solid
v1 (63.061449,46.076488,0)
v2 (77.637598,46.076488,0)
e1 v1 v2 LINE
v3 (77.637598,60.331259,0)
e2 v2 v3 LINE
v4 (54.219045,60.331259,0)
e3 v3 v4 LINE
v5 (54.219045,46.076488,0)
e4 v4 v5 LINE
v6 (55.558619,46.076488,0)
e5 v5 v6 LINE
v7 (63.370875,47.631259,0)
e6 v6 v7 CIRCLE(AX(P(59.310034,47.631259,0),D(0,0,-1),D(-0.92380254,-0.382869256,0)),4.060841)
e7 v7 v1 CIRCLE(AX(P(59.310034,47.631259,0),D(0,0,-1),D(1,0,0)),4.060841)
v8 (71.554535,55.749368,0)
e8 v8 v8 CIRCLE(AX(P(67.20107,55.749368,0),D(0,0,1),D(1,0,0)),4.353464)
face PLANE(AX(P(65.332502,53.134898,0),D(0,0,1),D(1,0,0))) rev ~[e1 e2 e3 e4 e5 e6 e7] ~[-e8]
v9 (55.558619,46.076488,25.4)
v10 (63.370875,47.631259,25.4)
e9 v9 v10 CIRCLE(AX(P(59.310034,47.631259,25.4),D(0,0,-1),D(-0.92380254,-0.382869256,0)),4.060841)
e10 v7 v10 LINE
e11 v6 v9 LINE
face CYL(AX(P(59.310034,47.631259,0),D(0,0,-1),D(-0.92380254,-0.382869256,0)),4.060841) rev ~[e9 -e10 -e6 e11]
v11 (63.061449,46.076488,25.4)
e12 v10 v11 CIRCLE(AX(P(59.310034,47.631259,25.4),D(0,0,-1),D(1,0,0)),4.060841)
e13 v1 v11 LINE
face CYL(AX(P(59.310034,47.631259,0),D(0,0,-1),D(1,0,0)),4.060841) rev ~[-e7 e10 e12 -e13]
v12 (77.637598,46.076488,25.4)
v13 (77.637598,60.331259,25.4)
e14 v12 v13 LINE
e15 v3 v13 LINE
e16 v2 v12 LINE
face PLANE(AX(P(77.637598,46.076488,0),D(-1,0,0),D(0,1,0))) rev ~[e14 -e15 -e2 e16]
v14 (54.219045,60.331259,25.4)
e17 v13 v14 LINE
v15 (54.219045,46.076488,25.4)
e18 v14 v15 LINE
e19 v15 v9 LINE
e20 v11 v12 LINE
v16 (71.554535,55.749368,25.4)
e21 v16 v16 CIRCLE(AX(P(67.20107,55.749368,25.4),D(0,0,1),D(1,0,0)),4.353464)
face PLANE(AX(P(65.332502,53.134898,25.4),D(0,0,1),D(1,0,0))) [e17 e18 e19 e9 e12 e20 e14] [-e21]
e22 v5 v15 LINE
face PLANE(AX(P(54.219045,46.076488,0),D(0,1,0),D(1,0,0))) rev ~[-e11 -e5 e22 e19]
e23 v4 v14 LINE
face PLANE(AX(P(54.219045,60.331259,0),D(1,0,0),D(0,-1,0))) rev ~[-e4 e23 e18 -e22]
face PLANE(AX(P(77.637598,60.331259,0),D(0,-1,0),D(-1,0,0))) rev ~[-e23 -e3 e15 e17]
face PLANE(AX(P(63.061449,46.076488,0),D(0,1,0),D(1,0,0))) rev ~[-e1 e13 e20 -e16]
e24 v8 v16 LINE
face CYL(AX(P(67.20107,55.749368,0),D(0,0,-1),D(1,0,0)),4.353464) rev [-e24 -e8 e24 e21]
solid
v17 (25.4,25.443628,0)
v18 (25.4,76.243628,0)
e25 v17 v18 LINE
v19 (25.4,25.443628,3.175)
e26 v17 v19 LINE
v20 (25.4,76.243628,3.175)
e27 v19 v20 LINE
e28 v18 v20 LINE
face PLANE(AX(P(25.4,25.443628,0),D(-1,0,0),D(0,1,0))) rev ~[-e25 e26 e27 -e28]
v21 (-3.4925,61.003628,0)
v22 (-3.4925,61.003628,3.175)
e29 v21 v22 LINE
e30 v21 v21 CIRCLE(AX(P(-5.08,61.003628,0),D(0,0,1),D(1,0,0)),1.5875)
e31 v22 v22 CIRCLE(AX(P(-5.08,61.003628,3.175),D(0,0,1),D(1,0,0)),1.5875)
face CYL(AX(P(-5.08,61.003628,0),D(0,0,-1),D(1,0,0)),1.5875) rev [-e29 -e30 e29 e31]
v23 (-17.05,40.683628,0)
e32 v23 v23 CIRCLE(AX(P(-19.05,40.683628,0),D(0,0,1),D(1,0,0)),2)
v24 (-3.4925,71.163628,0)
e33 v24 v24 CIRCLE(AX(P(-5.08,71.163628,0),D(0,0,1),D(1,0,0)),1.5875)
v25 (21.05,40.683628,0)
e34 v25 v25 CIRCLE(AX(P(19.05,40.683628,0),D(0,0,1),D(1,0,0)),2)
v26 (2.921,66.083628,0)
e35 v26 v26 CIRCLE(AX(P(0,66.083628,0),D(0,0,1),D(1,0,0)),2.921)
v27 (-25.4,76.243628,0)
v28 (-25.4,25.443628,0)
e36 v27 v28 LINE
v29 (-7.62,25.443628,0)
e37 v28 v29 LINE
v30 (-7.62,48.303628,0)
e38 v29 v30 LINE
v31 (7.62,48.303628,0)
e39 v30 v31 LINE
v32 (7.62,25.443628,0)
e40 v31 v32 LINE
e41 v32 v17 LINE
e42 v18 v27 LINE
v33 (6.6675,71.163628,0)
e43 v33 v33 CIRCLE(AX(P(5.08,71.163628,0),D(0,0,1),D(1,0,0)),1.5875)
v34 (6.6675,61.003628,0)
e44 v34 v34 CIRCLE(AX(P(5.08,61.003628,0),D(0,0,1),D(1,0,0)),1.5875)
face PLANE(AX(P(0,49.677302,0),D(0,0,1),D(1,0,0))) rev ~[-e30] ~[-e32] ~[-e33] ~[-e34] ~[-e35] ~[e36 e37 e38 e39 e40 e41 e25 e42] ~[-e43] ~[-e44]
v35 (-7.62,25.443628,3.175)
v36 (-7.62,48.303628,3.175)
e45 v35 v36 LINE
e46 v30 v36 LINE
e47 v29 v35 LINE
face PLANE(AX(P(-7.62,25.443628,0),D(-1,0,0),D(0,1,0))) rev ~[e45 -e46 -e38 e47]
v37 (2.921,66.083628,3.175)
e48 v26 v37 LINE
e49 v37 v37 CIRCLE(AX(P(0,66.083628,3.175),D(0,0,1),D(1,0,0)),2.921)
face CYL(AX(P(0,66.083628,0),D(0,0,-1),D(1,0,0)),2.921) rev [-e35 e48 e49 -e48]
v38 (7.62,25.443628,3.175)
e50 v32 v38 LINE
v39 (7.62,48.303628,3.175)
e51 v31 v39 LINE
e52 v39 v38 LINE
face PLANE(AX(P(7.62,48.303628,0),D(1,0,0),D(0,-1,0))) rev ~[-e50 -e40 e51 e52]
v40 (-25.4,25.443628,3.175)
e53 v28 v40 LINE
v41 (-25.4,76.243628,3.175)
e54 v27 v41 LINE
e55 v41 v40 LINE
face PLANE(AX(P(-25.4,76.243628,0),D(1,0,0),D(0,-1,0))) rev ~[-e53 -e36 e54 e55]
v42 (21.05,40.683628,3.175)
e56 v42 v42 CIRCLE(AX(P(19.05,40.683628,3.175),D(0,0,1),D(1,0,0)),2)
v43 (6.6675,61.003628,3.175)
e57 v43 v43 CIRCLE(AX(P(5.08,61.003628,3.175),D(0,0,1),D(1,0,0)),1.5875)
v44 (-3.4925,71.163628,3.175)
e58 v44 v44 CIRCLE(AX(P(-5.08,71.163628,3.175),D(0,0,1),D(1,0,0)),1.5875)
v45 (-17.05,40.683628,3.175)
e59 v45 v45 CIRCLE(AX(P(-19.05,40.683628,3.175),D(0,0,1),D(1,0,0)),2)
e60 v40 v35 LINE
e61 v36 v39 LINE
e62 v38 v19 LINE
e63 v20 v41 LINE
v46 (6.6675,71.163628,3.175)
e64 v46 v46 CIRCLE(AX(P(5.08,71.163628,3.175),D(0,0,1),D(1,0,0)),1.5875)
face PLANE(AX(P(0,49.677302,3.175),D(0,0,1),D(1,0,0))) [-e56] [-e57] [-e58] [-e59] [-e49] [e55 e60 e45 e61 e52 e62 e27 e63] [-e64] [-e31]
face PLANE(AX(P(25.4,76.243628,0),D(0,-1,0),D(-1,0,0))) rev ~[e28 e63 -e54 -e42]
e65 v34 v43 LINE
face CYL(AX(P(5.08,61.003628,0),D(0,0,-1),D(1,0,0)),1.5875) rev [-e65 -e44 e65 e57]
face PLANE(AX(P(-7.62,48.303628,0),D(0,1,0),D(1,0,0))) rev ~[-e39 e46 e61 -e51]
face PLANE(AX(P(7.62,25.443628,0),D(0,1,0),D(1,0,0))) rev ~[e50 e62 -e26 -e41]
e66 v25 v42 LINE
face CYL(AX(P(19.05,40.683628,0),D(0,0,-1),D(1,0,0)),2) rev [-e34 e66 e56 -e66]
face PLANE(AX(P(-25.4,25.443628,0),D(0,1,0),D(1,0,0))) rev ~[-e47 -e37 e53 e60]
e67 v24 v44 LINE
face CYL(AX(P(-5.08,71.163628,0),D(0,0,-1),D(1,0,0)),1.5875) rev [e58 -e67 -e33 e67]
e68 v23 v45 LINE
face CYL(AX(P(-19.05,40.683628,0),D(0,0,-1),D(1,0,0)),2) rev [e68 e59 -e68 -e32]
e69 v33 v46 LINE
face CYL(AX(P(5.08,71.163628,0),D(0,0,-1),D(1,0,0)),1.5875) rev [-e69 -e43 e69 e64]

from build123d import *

# Parameters (mm, degrees)
F0_R     = 2
F0_R_2   = 1.5875
F0_R_3   = 2.921
F1_DEPTH = 3.175
F0_R_4   = 4.3534644144
F2_DEPTH = 25.4


# Not quite as in the source:
# - a feature names something its author has since deleted; it is built from what else it names


with BuildPart() as f1:
    # F0 (on Top) → F1 (new body)
    with BuildSketch(Plane.XY):
        Polygon((-25.4, 76.2436284547), (-25.4, 25.4436284547), (-7.62, 25.4436284547), (-7.62, 48.3036284547), (7.62, 48.3036284547), (7.62, 25.4436284547), (25.4, 25.4436284547), (25.4, 76.2436284547), align=None)
        with Locations((-19.05, 40.6836284547)):
            Circle(F0_R, mode=Mode.SUBTRACT)
        with Locations((19.05, 40.6836284547)):
            Circle(F0_R, mode=Mode.SUBTRACT)
        with Locations((-5.08, 61.0036284547)):
            Circle(F0_R_2, mode=Mode.SUBTRACT)
        with Locations((5.08, 61.0036284547)):
            Circle(F0_R_2, mode=Mode.SUBTRACT)
        with Locations((0, 66.0836284547)):
            Circle(F0_R_3, mode=Mode.SUBTRACT)
        with Locations((-5.08, 71.1636284547)):
            Circle(F0_R_2, mode=Mode.SUBTRACT)
        with Locations((5.08, 71.1636284547)):
            Circle(F0_R_2, mode=Mode.SUBTRACT)
    extrude(amount=F1_DEPTH)


with BuildPart() as f2:
    # F0 (on Top) → F2 (new body)
    with BuildSketch(Plane.XY):
        with BuildLine():
            Line((77.6375979185, 60.3312589228), (54.219044745, 60.3312589228))
            Line((54.219044745, 60.3312589228), (54.219044745, 46.0764877498))
            Line((54.219044745, 46.0764877498), (55.5586186913, 46.0764877498))
            ThreePointArc((55.5586186913, 46.0764877498), (58.5174025864, 51.6139923023), (63.370874914, 47.6312589228))
            ThreePointArc((63.370874914, 47.6312589228), (63.2927672969, 46.8386275918), (63.0614491436, 46.0764877498))
            Line((63.0614491436, 46.0764877498), (77.6375979185, 46.0764877498))
            Line((77.6375979185, 46.0764877498), (77.6375979185, 60.3312589228))
        make_face()
        with Locations((67.2010704875, 55.7493679225)):
            Circle(F0_R_4, mode=Mode.SUBTRACT)
    extrude(amount=F2_DEPTH)


solid = Compound([f1.part, f2.part])
